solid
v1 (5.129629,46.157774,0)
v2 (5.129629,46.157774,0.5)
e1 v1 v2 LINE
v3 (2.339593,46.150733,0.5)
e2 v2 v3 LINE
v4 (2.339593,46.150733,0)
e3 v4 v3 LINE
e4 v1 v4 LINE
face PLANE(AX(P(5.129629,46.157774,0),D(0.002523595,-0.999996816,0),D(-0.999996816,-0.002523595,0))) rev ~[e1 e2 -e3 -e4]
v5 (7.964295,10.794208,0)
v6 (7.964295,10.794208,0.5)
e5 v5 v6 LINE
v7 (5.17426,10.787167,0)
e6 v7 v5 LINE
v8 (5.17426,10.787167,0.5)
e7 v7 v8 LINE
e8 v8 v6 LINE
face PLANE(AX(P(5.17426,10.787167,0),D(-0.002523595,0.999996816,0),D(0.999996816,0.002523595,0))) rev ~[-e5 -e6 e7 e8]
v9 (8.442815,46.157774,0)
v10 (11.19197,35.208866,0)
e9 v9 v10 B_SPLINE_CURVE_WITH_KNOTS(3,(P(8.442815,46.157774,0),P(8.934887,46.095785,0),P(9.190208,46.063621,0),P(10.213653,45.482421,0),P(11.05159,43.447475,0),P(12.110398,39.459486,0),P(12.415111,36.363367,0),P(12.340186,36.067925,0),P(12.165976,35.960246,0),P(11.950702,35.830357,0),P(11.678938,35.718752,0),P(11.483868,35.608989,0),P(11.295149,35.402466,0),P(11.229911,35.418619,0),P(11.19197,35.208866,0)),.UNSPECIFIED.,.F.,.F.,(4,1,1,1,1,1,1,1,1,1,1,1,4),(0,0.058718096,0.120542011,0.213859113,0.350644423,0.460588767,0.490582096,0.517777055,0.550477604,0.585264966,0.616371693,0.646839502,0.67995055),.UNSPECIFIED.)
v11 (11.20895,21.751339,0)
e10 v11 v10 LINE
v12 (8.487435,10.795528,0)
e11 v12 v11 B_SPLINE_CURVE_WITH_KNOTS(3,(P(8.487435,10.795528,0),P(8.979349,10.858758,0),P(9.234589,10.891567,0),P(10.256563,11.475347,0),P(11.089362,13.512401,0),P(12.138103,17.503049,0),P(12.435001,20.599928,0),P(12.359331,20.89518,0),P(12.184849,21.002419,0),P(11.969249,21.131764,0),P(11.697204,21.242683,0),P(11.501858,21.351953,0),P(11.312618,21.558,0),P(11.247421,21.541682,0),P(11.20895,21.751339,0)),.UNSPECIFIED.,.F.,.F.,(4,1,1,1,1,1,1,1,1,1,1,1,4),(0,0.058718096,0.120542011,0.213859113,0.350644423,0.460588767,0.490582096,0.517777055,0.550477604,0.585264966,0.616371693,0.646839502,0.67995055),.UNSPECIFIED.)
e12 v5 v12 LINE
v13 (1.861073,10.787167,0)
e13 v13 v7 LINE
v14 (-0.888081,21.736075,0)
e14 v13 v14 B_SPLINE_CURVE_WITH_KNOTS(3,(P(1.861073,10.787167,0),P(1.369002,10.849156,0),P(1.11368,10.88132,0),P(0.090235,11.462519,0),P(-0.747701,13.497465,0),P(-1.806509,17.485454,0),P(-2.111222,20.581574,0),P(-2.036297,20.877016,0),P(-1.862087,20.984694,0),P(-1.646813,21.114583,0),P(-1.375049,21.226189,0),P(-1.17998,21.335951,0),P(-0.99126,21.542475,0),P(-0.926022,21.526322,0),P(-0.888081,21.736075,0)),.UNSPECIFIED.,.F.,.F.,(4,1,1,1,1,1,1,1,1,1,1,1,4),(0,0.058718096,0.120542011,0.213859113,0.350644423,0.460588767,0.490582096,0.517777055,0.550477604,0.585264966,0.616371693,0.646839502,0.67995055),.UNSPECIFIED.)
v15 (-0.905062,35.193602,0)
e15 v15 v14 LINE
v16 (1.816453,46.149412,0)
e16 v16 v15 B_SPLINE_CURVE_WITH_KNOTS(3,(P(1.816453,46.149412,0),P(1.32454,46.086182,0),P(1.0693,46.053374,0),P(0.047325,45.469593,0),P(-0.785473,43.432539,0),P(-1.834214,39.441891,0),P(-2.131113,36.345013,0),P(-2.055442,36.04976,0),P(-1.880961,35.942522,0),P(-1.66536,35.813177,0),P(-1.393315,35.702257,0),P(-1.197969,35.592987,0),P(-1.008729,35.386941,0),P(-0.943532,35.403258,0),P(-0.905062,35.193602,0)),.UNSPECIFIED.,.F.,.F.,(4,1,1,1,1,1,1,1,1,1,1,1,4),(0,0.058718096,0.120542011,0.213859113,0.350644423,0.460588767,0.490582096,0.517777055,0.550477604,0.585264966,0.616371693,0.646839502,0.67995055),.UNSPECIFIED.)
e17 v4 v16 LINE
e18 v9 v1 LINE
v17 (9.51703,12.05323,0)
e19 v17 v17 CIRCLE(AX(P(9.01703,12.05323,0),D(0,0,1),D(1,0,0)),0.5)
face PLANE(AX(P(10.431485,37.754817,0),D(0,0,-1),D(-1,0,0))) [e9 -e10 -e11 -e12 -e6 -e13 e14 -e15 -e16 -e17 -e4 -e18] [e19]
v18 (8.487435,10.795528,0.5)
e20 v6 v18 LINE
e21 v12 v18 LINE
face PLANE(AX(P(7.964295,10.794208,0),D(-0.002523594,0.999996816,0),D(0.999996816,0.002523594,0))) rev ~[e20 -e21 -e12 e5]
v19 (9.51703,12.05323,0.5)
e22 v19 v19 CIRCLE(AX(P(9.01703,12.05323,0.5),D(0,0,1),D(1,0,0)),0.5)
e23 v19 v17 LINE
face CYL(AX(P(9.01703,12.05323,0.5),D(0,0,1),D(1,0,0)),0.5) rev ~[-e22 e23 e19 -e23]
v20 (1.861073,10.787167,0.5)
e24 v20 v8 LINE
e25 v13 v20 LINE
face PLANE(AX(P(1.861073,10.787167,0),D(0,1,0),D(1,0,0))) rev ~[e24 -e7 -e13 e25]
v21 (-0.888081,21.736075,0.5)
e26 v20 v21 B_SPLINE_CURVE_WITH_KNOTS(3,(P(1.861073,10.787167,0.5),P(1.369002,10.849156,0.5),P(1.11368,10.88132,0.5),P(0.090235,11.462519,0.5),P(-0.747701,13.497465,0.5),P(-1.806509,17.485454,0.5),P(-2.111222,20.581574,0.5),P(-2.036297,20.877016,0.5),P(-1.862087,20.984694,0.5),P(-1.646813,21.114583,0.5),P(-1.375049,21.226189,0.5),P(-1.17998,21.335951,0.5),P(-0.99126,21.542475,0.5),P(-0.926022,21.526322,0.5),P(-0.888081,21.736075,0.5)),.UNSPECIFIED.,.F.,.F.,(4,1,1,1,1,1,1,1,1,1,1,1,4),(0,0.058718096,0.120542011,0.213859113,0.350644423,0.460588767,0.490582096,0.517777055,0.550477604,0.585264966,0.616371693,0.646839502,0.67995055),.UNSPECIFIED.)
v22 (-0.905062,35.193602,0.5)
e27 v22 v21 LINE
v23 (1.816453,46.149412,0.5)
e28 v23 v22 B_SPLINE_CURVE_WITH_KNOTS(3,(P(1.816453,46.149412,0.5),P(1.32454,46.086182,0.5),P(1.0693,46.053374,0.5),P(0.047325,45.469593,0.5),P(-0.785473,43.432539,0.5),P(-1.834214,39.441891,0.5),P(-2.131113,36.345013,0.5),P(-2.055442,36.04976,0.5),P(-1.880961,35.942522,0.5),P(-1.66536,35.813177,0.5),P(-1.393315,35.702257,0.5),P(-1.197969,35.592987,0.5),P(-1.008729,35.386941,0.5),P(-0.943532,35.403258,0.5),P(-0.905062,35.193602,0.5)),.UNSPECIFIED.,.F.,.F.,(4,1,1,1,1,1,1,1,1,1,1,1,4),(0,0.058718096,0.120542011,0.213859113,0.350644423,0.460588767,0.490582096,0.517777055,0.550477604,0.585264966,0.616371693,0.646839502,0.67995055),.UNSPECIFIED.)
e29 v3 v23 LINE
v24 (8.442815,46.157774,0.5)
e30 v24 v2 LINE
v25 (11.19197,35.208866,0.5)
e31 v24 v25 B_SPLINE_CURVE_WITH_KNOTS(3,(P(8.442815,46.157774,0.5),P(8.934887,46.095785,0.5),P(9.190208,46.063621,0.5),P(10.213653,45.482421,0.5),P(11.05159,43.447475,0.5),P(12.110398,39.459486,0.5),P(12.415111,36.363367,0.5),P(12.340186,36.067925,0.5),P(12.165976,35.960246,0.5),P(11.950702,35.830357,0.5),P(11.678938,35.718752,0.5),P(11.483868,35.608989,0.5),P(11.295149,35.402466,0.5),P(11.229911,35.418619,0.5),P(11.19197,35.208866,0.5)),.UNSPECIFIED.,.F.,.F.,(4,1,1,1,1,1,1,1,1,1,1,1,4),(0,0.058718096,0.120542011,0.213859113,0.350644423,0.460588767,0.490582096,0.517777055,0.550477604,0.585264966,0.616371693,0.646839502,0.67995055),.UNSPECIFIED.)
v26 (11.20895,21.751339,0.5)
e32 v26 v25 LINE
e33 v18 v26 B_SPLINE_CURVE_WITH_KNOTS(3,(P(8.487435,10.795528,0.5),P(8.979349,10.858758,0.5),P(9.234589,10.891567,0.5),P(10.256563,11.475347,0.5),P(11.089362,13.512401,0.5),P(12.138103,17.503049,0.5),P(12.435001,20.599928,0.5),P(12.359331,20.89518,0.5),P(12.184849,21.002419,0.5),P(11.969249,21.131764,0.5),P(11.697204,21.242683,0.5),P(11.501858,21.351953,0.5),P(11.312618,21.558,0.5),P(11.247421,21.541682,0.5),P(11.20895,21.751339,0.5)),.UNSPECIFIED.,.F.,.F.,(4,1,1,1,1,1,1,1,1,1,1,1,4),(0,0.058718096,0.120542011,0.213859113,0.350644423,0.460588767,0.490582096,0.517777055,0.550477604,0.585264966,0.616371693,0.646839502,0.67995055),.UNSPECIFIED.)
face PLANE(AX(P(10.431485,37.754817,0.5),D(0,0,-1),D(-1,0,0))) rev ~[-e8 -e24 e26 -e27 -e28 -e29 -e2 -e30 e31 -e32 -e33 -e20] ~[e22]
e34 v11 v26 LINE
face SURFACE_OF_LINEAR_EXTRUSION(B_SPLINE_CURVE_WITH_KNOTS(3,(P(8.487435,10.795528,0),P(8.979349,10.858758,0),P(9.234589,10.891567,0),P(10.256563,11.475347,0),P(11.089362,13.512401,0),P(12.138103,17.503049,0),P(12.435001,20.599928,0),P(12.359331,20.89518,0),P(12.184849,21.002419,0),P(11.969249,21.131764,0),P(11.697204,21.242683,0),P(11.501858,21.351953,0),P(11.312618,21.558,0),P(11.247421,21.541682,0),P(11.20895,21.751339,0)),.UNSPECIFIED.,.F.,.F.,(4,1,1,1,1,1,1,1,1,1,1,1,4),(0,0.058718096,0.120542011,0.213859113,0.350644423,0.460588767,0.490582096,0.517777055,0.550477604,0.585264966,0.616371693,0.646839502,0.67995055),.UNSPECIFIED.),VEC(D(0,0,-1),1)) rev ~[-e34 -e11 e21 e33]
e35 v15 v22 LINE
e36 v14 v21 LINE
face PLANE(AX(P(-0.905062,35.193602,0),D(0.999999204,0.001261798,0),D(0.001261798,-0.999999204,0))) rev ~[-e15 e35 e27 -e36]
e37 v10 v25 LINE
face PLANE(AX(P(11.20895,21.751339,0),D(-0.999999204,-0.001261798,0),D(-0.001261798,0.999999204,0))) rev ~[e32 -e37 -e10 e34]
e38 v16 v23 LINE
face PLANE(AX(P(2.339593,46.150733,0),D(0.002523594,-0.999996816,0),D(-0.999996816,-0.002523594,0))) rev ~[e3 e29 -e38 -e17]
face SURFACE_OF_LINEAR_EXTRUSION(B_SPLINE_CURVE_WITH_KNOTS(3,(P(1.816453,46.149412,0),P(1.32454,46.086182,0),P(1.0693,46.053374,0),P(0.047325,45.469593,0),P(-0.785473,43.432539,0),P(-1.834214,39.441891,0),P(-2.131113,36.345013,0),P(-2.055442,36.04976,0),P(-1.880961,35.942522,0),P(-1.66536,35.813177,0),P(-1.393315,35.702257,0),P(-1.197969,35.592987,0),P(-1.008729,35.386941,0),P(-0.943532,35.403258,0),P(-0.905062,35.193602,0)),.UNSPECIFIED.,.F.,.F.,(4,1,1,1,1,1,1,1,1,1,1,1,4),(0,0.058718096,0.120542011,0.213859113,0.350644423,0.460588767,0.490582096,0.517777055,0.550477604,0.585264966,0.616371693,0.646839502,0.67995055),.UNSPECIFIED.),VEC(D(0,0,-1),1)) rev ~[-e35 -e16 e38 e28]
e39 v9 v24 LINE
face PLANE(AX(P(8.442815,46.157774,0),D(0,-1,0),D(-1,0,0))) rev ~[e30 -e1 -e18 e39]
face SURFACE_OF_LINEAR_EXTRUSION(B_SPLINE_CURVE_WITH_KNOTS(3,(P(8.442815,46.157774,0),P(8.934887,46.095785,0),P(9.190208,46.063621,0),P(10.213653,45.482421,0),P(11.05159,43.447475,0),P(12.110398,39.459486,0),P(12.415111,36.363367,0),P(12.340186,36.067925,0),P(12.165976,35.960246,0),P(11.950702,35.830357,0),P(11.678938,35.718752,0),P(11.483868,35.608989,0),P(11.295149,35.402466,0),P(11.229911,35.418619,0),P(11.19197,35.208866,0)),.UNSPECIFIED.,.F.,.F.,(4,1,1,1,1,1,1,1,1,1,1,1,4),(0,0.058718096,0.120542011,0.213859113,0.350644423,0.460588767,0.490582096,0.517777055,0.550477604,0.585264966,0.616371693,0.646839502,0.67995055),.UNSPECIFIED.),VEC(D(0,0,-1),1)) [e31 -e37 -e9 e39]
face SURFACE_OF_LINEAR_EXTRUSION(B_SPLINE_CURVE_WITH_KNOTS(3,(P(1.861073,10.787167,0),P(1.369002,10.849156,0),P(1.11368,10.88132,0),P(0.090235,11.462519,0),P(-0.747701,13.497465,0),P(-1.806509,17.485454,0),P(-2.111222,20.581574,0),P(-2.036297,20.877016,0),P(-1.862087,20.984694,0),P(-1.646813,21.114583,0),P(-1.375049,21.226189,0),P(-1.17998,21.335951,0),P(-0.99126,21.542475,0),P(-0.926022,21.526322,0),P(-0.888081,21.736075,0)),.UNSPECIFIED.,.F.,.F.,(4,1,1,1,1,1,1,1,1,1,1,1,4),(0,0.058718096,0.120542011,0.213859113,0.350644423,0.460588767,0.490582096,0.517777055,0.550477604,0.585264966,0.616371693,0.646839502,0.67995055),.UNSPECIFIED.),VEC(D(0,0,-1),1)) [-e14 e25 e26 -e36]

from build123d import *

# Parameters (mm, degrees)
F1_DEPTH = 0.5
F2_R     = 0.5
F3_DEPTH = 25


with BuildPart() as f1:
    # F0 (on Top) → F1 (new body)
    with BuildSketch(Plane.XY):
        with BuildLine():
            add(Edge.make_bspline(
                [(8.4428153932, 46.1577735841), (8.9348866368, 46.0957848403), (9.1902084572, 46.063620605), (10.2136533947, 45.482421242), (11.0515898848, 43.4474753339), (12.1103981, 39.4594863885), (12.4151111507, 36.3633669949), (12.340186084, 36.0679246479), (12.165975669, 35.9602462388), (11.9507020497, 35.8303573833), (11.6789376951, 35.7187516393), (11.4838684771, 35.6089894059), (11.2951492349, 35.402465646), (11.2299108219, 35.4186188516), (11.1919697374, 35.2088660002)],
                knots=[0, 0, 0, 0, 0.0587180961, 0.1205420114, 0.2138591133, 0.3506444227, 0.4605887666, 0.4905820957, 0.5177770546, 0.5504776042, 0.5852649664, 0.6163716927, 0.6468395023, 0.6799505505, 0.6799505505, 0.6799505505, 0.6799505505], degree=3))
            Line((8.4428153932, 46.1577735841), (7.9196737637, 46.1577735841))
            add(Edge.make_bspline(
                [(10.6898430557, 28.479457974), (10.2008874142, 35.3660491094), (9.3819124933, 45.0954346997), (7.9196737637, 46.1577735841)],
                knots=[0.7815795169, 0.7815795169, 0.7815795169, 0.7815795169, 0.988282322, 0.988282322, 0.988282322, 0.988282322], degree=3))
            add(Edge.make_bspline(
                [(11.1919697374, 35.2088660002), (11.0755157617, 34.5650638059), (10.9217010225, 31.865964087), (10.6898430557, 28.479457974)],
                knots=[0.6799505505, 0.6799505505, 0.6799505505, 0.6799505505, 0.7815795169, 0.7815795169, 0.7815795169, 0.7815795169], degree=3))
        make_face()
        with BuildLine():
            Line((11.2089504357, 21.7513385402), (11.1919697374, 35.2088660002))
            add(Edge.make_bspline(
                [(11.1919697374, 35.2088660002), (11.0755157617, 34.5650638059), (10.9217010225, 31.865964087), (10.6898430557, 28.479457974)],
                knots=[0.6799505505, 0.6799505505, 0.6799505505, 0.6799505505, 0.7815795169, 0.7815795169, 0.7815795169, 0.7815795169], degree=3))
            add(Edge.make_bspline(
                [(11.2089504357, 21.7513385402), (11.0908721351, 22.3948448019), (10.9302464525, 25.0935477601), (10.6898430557, 28.479457974)],
                knots=[0.6799505505, 0.6799505505, 0.6799505505, 0.6799505505, 0.7815795169, 0.7815795169, 0.7815795169, 0.7815795169], degree=3))
        make_face()
        with BuildLine():
            add(Edge.make_bspline(
                [(10.6898430557, 28.479457974), (10.2008874142, 35.3660491094), (9.3819124933, 45.0954346997), (7.9196737637, 46.1577735841)],
                knots=[0.7815795169, 0.7815795169, 0.7815795169, 0.7815795169, 0.988282322, 0.988282322, 0.988282322, 0.988282322], degree=3))
            Line((7.9196737637, 46.1577735841), (5.1296291058, 46.1577735841))
            Line((5.1296291058, 46.1577735841), (2.3395933321, 46.1507326427))
            add(Edge.make_bspline(
                [(-0.3859542385, 28.4654825411), (0.0856208824, 35.3532856734), (0.8800401713, 45.0847070435), (2.3395933321, 46.1507326427)],
                knots=[0.7815795169, 0.7815795169, 0.7815795169, 0.7815795169, 0.988282322, 0.988282322, 0.988282322, 0.988282322], degree=3))
            add(Edge.make_bspline(
                [(-0.3859542385, 28.4654825411), (0.103001403, 21.5788914057), (0.9219763239, 11.8495058153), (2.3842150534, 10.787166931)],
                knots=[0.7815795169, 0.7815795169, 0.7815795169, 0.7815795169, 0.988282322, 0.988282322, 0.988282322, 0.988282322], degree=3))
            Line((2.3842150534, 10.787166931), (5.1742597114, 10.787166931))
            Line((5.1742597114, 10.787166931), (7.9642954851, 10.7942078724))
            add(Edge.make_bspline(
                [(10.6898430557, 28.479457974), (10.2182679348, 21.5916548416), (9.4238486459, 11.8602334716), (7.9642954851, 10.7942078724)],
                knots=[0.7815795169, 0.7815795169, 0.7815795169, 0.7815795169, 0.988282322, 0.988282322, 0.988282322, 0.988282322], degree=3))
        make_face()
        with BuildLine():
            add(Edge.make_bspline(
                [(11.2089504357, 21.7513385402), (11.0908721351, 22.3948448019), (10.9302464525, 25.0935477601), (10.6898430557, 28.479457974)],
                knots=[0.6799505505, 0.6799505505, 0.6799505505, 0.6799505505, 0.7815795169, 0.7815795169, 0.7815795169, 0.7815795169], degree=3))
            add(Edge.make_bspline(
                [(10.6898430557, 28.479457974), (10.2182679348, 21.5916548416), (9.4238486459, 11.8602334716), (7.9642954851, 10.7942078724)],
                knots=[0.7815795169, 0.7815795169, 0.7815795169, 0.7815795169, 0.988282322, 0.988282322, 0.988282322, 0.988282322], degree=3))
            Line((7.9642954851, 10.7942078724), (8.4874354488, 10.7955280697))
            add(Edge.make_bspline(
                [(8.4874354488, 10.7955280697), (8.979348691, 10.8587584044), (9.2345885289, 10.8915668661), (10.2565634959, 11.4753471384), (11.0893619395, 13.5124011787), (12.1381027161, 17.5030494278), (12.4350014466, 20.5999279348), (12.3593310418, 20.8951802605), (12.1848494448, 21.0024186902), (11.9692487242, 21.1317638688), (11.6972035874, 21.2426834344), (11.5018579952, 21.3519530427), (11.3126181717, 21.5579998941), (11.2474207306, 21.5416821046), (11.2089504357, 21.7513385402)],
                knots=[0, 0, 0, 0, 0.0587180961, 0.1205420114, 0.2138591133, 0.3506444227, 0.4605887666, 0.4905820957, 0.5177770546, 0.5504776042, 0.5852649664, 0.6163716927, 0.6468395023, 0.6799505505, 0.6799505505, 0.6799505505, 0.6799505505], degree=3))
        make_face()
        with BuildLine():
            add(Edge.make_bspline(
                [(-0.3859542385, 28.4654825411), (0.0856208824, 35.3532856734), (0.8800401713, 45.0847070435), (2.3395933321, 46.1507326427)],
                knots=[0.7815795169, 0.7815795169, 0.7815795169, 0.7815795169, 0.988282322, 0.988282322, 0.988282322, 0.988282322], degree=3))
            Line((2.3395933321, 46.1507326427), (1.8164533684, 46.1494124454))
            add(Edge.make_bspline(
                [(1.8164533684, 46.1494124454), (1.3245401262, 46.0861821106), (1.0693002883, 46.053373649), (0.0473253212, 45.4695933766), (-0.7854731224, 43.4325393364), (-1.834213899, 39.4418910872), (-2.1311126294, 36.3450125803), (-2.0554422246, 36.0497602546), (-1.8809606277, 35.9425218249), (-1.6653599071, 35.8131766463), (-1.3933147702, 35.7022570807), (-1.197969178, 35.5929874724), (-1.0087293545, 35.3869406209), (-0.9435319134, 35.4032584105), (-0.9050616186, 35.1936019748)],
                knots=[0, 0, 0, 0, 0.0587180961, 0.1205420114, 0.2138591133, 0.3506444227, 0.4605887666, 0.4905820957, 0.5177770546, 0.5504776042, 0.5852649664, 0.6163716927, 0.6468395023, 0.6799505505, 0.6799505505, 0.6799505505, 0.6799505505], degree=3))
            add(Edge.make_bspline(
                [(-0.9050616186, 35.1936019748), (-0.7869833179, 34.5500957132), (-0.6263576353, 31.851392755), (-0.3859542385, 28.4654825411)],
                knots=[0.6799505505, 0.6799505505, 0.6799505505, 0.6799505505, 0.7815795169, 0.7815795169, 0.7815795169, 0.7815795169], degree=3))
        make_face()
        with BuildLine():
            add(Edge.make_bspline(
                [(-0.8880809202, 21.7360745149), (-0.7716269445, 22.3798767092), (-0.6178122053, 25.0789764281), (-0.3859542385, 28.4654825411)],
                knots=[0.6799505505, 0.6799505505, 0.6799505505, 0.6799505505, 0.7815795169, 0.7815795169, 0.7815795169, 0.7815795169], degree=3))
            add(Edge.make_bspline(
                [(-0.9050616186, 35.1936019748), (-0.7869833179, 34.5500957132), (-0.6263576353, 31.851392755), (-0.3859542385, 28.4654825411)],
                knots=[0.6799505505, 0.6799505505, 0.6799505505, 0.6799505505, 0.7815795169, 0.7815795169, 0.7815795169, 0.7815795169], degree=3))
            Line((-0.9050616186, 35.1936019748), (-0.8880809202, 21.7360745149))
        make_face()
        with BuildLine():
            add(Edge.make_bspline(
                [(-0.3859542385, 28.4654825411), (0.103001403, 21.5788914057), (0.9219763239, 11.8495058153), (2.3842150534, 10.787166931)],
                knots=[0.7815795169, 0.7815795169, 0.7815795169, 0.7815795169, 0.988282322, 0.988282322, 0.988282322, 0.988282322], degree=3))
            add(Edge.make_bspline(
                [(-0.8880809202, 21.7360745149), (-0.7716269445, 22.3798767092), (-0.6178122053, 25.0789764281), (-0.3859542385, 28.4654825411)],
                knots=[0.6799505505, 0.6799505505, 0.6799505505, 0.6799505505, 0.7815795169, 0.7815795169, 0.7815795169, 0.7815795169], degree=3))
            add(Edge.make_bspline(
                [(1.861073424, 10.787166931), (1.3690021804, 10.8491556748), (1.11368036, 10.8813199101), (0.0902354225, 11.4625192731), (-0.7477010677, 13.4974651812), (-1.8065092829, 17.4854541266), (-2.1112223335, 20.5815735202), (-2.0362972668, 20.8770158672), (-1.8620868518, 20.9846942763), (-1.6468132325, 21.1145831317), (-1.375048878, 21.2261888758), (-1.1799796599, 21.3359511092), (-0.9912604178, 21.5424748691), (-0.9260220048, 21.5263216634), (-0.8880809202, 21.7360745149)],
                knots=[0, 0, 0, 0, 0.0587180961, 0.1205420114, 0.2138591133, 0.3506444227, 0.4605887666, 0.4905820957, 0.5177770546, 0.5504776042, 0.5852649664, 0.6163716927, 0.6468395023, 0.6799505505, 0.6799505505, 0.6799505505, 0.6799505505], degree=3))
            Line((1.861073424, 10.787166931), (2.3842150534, 10.787166931))
        make_face()
    extrude(amount=F1_DEPTH)

    # F2 (on face) → F3 (cut)
    with BuildSketch(Plane.XY.offset(0.5)):
        with Locations((9.0170297772, 12.0532298461)):
            Circle(F2_R)
    extrude(amount=-F3_DEPTH, mode=Mode.SUBTRACT)


solid = f1.part
